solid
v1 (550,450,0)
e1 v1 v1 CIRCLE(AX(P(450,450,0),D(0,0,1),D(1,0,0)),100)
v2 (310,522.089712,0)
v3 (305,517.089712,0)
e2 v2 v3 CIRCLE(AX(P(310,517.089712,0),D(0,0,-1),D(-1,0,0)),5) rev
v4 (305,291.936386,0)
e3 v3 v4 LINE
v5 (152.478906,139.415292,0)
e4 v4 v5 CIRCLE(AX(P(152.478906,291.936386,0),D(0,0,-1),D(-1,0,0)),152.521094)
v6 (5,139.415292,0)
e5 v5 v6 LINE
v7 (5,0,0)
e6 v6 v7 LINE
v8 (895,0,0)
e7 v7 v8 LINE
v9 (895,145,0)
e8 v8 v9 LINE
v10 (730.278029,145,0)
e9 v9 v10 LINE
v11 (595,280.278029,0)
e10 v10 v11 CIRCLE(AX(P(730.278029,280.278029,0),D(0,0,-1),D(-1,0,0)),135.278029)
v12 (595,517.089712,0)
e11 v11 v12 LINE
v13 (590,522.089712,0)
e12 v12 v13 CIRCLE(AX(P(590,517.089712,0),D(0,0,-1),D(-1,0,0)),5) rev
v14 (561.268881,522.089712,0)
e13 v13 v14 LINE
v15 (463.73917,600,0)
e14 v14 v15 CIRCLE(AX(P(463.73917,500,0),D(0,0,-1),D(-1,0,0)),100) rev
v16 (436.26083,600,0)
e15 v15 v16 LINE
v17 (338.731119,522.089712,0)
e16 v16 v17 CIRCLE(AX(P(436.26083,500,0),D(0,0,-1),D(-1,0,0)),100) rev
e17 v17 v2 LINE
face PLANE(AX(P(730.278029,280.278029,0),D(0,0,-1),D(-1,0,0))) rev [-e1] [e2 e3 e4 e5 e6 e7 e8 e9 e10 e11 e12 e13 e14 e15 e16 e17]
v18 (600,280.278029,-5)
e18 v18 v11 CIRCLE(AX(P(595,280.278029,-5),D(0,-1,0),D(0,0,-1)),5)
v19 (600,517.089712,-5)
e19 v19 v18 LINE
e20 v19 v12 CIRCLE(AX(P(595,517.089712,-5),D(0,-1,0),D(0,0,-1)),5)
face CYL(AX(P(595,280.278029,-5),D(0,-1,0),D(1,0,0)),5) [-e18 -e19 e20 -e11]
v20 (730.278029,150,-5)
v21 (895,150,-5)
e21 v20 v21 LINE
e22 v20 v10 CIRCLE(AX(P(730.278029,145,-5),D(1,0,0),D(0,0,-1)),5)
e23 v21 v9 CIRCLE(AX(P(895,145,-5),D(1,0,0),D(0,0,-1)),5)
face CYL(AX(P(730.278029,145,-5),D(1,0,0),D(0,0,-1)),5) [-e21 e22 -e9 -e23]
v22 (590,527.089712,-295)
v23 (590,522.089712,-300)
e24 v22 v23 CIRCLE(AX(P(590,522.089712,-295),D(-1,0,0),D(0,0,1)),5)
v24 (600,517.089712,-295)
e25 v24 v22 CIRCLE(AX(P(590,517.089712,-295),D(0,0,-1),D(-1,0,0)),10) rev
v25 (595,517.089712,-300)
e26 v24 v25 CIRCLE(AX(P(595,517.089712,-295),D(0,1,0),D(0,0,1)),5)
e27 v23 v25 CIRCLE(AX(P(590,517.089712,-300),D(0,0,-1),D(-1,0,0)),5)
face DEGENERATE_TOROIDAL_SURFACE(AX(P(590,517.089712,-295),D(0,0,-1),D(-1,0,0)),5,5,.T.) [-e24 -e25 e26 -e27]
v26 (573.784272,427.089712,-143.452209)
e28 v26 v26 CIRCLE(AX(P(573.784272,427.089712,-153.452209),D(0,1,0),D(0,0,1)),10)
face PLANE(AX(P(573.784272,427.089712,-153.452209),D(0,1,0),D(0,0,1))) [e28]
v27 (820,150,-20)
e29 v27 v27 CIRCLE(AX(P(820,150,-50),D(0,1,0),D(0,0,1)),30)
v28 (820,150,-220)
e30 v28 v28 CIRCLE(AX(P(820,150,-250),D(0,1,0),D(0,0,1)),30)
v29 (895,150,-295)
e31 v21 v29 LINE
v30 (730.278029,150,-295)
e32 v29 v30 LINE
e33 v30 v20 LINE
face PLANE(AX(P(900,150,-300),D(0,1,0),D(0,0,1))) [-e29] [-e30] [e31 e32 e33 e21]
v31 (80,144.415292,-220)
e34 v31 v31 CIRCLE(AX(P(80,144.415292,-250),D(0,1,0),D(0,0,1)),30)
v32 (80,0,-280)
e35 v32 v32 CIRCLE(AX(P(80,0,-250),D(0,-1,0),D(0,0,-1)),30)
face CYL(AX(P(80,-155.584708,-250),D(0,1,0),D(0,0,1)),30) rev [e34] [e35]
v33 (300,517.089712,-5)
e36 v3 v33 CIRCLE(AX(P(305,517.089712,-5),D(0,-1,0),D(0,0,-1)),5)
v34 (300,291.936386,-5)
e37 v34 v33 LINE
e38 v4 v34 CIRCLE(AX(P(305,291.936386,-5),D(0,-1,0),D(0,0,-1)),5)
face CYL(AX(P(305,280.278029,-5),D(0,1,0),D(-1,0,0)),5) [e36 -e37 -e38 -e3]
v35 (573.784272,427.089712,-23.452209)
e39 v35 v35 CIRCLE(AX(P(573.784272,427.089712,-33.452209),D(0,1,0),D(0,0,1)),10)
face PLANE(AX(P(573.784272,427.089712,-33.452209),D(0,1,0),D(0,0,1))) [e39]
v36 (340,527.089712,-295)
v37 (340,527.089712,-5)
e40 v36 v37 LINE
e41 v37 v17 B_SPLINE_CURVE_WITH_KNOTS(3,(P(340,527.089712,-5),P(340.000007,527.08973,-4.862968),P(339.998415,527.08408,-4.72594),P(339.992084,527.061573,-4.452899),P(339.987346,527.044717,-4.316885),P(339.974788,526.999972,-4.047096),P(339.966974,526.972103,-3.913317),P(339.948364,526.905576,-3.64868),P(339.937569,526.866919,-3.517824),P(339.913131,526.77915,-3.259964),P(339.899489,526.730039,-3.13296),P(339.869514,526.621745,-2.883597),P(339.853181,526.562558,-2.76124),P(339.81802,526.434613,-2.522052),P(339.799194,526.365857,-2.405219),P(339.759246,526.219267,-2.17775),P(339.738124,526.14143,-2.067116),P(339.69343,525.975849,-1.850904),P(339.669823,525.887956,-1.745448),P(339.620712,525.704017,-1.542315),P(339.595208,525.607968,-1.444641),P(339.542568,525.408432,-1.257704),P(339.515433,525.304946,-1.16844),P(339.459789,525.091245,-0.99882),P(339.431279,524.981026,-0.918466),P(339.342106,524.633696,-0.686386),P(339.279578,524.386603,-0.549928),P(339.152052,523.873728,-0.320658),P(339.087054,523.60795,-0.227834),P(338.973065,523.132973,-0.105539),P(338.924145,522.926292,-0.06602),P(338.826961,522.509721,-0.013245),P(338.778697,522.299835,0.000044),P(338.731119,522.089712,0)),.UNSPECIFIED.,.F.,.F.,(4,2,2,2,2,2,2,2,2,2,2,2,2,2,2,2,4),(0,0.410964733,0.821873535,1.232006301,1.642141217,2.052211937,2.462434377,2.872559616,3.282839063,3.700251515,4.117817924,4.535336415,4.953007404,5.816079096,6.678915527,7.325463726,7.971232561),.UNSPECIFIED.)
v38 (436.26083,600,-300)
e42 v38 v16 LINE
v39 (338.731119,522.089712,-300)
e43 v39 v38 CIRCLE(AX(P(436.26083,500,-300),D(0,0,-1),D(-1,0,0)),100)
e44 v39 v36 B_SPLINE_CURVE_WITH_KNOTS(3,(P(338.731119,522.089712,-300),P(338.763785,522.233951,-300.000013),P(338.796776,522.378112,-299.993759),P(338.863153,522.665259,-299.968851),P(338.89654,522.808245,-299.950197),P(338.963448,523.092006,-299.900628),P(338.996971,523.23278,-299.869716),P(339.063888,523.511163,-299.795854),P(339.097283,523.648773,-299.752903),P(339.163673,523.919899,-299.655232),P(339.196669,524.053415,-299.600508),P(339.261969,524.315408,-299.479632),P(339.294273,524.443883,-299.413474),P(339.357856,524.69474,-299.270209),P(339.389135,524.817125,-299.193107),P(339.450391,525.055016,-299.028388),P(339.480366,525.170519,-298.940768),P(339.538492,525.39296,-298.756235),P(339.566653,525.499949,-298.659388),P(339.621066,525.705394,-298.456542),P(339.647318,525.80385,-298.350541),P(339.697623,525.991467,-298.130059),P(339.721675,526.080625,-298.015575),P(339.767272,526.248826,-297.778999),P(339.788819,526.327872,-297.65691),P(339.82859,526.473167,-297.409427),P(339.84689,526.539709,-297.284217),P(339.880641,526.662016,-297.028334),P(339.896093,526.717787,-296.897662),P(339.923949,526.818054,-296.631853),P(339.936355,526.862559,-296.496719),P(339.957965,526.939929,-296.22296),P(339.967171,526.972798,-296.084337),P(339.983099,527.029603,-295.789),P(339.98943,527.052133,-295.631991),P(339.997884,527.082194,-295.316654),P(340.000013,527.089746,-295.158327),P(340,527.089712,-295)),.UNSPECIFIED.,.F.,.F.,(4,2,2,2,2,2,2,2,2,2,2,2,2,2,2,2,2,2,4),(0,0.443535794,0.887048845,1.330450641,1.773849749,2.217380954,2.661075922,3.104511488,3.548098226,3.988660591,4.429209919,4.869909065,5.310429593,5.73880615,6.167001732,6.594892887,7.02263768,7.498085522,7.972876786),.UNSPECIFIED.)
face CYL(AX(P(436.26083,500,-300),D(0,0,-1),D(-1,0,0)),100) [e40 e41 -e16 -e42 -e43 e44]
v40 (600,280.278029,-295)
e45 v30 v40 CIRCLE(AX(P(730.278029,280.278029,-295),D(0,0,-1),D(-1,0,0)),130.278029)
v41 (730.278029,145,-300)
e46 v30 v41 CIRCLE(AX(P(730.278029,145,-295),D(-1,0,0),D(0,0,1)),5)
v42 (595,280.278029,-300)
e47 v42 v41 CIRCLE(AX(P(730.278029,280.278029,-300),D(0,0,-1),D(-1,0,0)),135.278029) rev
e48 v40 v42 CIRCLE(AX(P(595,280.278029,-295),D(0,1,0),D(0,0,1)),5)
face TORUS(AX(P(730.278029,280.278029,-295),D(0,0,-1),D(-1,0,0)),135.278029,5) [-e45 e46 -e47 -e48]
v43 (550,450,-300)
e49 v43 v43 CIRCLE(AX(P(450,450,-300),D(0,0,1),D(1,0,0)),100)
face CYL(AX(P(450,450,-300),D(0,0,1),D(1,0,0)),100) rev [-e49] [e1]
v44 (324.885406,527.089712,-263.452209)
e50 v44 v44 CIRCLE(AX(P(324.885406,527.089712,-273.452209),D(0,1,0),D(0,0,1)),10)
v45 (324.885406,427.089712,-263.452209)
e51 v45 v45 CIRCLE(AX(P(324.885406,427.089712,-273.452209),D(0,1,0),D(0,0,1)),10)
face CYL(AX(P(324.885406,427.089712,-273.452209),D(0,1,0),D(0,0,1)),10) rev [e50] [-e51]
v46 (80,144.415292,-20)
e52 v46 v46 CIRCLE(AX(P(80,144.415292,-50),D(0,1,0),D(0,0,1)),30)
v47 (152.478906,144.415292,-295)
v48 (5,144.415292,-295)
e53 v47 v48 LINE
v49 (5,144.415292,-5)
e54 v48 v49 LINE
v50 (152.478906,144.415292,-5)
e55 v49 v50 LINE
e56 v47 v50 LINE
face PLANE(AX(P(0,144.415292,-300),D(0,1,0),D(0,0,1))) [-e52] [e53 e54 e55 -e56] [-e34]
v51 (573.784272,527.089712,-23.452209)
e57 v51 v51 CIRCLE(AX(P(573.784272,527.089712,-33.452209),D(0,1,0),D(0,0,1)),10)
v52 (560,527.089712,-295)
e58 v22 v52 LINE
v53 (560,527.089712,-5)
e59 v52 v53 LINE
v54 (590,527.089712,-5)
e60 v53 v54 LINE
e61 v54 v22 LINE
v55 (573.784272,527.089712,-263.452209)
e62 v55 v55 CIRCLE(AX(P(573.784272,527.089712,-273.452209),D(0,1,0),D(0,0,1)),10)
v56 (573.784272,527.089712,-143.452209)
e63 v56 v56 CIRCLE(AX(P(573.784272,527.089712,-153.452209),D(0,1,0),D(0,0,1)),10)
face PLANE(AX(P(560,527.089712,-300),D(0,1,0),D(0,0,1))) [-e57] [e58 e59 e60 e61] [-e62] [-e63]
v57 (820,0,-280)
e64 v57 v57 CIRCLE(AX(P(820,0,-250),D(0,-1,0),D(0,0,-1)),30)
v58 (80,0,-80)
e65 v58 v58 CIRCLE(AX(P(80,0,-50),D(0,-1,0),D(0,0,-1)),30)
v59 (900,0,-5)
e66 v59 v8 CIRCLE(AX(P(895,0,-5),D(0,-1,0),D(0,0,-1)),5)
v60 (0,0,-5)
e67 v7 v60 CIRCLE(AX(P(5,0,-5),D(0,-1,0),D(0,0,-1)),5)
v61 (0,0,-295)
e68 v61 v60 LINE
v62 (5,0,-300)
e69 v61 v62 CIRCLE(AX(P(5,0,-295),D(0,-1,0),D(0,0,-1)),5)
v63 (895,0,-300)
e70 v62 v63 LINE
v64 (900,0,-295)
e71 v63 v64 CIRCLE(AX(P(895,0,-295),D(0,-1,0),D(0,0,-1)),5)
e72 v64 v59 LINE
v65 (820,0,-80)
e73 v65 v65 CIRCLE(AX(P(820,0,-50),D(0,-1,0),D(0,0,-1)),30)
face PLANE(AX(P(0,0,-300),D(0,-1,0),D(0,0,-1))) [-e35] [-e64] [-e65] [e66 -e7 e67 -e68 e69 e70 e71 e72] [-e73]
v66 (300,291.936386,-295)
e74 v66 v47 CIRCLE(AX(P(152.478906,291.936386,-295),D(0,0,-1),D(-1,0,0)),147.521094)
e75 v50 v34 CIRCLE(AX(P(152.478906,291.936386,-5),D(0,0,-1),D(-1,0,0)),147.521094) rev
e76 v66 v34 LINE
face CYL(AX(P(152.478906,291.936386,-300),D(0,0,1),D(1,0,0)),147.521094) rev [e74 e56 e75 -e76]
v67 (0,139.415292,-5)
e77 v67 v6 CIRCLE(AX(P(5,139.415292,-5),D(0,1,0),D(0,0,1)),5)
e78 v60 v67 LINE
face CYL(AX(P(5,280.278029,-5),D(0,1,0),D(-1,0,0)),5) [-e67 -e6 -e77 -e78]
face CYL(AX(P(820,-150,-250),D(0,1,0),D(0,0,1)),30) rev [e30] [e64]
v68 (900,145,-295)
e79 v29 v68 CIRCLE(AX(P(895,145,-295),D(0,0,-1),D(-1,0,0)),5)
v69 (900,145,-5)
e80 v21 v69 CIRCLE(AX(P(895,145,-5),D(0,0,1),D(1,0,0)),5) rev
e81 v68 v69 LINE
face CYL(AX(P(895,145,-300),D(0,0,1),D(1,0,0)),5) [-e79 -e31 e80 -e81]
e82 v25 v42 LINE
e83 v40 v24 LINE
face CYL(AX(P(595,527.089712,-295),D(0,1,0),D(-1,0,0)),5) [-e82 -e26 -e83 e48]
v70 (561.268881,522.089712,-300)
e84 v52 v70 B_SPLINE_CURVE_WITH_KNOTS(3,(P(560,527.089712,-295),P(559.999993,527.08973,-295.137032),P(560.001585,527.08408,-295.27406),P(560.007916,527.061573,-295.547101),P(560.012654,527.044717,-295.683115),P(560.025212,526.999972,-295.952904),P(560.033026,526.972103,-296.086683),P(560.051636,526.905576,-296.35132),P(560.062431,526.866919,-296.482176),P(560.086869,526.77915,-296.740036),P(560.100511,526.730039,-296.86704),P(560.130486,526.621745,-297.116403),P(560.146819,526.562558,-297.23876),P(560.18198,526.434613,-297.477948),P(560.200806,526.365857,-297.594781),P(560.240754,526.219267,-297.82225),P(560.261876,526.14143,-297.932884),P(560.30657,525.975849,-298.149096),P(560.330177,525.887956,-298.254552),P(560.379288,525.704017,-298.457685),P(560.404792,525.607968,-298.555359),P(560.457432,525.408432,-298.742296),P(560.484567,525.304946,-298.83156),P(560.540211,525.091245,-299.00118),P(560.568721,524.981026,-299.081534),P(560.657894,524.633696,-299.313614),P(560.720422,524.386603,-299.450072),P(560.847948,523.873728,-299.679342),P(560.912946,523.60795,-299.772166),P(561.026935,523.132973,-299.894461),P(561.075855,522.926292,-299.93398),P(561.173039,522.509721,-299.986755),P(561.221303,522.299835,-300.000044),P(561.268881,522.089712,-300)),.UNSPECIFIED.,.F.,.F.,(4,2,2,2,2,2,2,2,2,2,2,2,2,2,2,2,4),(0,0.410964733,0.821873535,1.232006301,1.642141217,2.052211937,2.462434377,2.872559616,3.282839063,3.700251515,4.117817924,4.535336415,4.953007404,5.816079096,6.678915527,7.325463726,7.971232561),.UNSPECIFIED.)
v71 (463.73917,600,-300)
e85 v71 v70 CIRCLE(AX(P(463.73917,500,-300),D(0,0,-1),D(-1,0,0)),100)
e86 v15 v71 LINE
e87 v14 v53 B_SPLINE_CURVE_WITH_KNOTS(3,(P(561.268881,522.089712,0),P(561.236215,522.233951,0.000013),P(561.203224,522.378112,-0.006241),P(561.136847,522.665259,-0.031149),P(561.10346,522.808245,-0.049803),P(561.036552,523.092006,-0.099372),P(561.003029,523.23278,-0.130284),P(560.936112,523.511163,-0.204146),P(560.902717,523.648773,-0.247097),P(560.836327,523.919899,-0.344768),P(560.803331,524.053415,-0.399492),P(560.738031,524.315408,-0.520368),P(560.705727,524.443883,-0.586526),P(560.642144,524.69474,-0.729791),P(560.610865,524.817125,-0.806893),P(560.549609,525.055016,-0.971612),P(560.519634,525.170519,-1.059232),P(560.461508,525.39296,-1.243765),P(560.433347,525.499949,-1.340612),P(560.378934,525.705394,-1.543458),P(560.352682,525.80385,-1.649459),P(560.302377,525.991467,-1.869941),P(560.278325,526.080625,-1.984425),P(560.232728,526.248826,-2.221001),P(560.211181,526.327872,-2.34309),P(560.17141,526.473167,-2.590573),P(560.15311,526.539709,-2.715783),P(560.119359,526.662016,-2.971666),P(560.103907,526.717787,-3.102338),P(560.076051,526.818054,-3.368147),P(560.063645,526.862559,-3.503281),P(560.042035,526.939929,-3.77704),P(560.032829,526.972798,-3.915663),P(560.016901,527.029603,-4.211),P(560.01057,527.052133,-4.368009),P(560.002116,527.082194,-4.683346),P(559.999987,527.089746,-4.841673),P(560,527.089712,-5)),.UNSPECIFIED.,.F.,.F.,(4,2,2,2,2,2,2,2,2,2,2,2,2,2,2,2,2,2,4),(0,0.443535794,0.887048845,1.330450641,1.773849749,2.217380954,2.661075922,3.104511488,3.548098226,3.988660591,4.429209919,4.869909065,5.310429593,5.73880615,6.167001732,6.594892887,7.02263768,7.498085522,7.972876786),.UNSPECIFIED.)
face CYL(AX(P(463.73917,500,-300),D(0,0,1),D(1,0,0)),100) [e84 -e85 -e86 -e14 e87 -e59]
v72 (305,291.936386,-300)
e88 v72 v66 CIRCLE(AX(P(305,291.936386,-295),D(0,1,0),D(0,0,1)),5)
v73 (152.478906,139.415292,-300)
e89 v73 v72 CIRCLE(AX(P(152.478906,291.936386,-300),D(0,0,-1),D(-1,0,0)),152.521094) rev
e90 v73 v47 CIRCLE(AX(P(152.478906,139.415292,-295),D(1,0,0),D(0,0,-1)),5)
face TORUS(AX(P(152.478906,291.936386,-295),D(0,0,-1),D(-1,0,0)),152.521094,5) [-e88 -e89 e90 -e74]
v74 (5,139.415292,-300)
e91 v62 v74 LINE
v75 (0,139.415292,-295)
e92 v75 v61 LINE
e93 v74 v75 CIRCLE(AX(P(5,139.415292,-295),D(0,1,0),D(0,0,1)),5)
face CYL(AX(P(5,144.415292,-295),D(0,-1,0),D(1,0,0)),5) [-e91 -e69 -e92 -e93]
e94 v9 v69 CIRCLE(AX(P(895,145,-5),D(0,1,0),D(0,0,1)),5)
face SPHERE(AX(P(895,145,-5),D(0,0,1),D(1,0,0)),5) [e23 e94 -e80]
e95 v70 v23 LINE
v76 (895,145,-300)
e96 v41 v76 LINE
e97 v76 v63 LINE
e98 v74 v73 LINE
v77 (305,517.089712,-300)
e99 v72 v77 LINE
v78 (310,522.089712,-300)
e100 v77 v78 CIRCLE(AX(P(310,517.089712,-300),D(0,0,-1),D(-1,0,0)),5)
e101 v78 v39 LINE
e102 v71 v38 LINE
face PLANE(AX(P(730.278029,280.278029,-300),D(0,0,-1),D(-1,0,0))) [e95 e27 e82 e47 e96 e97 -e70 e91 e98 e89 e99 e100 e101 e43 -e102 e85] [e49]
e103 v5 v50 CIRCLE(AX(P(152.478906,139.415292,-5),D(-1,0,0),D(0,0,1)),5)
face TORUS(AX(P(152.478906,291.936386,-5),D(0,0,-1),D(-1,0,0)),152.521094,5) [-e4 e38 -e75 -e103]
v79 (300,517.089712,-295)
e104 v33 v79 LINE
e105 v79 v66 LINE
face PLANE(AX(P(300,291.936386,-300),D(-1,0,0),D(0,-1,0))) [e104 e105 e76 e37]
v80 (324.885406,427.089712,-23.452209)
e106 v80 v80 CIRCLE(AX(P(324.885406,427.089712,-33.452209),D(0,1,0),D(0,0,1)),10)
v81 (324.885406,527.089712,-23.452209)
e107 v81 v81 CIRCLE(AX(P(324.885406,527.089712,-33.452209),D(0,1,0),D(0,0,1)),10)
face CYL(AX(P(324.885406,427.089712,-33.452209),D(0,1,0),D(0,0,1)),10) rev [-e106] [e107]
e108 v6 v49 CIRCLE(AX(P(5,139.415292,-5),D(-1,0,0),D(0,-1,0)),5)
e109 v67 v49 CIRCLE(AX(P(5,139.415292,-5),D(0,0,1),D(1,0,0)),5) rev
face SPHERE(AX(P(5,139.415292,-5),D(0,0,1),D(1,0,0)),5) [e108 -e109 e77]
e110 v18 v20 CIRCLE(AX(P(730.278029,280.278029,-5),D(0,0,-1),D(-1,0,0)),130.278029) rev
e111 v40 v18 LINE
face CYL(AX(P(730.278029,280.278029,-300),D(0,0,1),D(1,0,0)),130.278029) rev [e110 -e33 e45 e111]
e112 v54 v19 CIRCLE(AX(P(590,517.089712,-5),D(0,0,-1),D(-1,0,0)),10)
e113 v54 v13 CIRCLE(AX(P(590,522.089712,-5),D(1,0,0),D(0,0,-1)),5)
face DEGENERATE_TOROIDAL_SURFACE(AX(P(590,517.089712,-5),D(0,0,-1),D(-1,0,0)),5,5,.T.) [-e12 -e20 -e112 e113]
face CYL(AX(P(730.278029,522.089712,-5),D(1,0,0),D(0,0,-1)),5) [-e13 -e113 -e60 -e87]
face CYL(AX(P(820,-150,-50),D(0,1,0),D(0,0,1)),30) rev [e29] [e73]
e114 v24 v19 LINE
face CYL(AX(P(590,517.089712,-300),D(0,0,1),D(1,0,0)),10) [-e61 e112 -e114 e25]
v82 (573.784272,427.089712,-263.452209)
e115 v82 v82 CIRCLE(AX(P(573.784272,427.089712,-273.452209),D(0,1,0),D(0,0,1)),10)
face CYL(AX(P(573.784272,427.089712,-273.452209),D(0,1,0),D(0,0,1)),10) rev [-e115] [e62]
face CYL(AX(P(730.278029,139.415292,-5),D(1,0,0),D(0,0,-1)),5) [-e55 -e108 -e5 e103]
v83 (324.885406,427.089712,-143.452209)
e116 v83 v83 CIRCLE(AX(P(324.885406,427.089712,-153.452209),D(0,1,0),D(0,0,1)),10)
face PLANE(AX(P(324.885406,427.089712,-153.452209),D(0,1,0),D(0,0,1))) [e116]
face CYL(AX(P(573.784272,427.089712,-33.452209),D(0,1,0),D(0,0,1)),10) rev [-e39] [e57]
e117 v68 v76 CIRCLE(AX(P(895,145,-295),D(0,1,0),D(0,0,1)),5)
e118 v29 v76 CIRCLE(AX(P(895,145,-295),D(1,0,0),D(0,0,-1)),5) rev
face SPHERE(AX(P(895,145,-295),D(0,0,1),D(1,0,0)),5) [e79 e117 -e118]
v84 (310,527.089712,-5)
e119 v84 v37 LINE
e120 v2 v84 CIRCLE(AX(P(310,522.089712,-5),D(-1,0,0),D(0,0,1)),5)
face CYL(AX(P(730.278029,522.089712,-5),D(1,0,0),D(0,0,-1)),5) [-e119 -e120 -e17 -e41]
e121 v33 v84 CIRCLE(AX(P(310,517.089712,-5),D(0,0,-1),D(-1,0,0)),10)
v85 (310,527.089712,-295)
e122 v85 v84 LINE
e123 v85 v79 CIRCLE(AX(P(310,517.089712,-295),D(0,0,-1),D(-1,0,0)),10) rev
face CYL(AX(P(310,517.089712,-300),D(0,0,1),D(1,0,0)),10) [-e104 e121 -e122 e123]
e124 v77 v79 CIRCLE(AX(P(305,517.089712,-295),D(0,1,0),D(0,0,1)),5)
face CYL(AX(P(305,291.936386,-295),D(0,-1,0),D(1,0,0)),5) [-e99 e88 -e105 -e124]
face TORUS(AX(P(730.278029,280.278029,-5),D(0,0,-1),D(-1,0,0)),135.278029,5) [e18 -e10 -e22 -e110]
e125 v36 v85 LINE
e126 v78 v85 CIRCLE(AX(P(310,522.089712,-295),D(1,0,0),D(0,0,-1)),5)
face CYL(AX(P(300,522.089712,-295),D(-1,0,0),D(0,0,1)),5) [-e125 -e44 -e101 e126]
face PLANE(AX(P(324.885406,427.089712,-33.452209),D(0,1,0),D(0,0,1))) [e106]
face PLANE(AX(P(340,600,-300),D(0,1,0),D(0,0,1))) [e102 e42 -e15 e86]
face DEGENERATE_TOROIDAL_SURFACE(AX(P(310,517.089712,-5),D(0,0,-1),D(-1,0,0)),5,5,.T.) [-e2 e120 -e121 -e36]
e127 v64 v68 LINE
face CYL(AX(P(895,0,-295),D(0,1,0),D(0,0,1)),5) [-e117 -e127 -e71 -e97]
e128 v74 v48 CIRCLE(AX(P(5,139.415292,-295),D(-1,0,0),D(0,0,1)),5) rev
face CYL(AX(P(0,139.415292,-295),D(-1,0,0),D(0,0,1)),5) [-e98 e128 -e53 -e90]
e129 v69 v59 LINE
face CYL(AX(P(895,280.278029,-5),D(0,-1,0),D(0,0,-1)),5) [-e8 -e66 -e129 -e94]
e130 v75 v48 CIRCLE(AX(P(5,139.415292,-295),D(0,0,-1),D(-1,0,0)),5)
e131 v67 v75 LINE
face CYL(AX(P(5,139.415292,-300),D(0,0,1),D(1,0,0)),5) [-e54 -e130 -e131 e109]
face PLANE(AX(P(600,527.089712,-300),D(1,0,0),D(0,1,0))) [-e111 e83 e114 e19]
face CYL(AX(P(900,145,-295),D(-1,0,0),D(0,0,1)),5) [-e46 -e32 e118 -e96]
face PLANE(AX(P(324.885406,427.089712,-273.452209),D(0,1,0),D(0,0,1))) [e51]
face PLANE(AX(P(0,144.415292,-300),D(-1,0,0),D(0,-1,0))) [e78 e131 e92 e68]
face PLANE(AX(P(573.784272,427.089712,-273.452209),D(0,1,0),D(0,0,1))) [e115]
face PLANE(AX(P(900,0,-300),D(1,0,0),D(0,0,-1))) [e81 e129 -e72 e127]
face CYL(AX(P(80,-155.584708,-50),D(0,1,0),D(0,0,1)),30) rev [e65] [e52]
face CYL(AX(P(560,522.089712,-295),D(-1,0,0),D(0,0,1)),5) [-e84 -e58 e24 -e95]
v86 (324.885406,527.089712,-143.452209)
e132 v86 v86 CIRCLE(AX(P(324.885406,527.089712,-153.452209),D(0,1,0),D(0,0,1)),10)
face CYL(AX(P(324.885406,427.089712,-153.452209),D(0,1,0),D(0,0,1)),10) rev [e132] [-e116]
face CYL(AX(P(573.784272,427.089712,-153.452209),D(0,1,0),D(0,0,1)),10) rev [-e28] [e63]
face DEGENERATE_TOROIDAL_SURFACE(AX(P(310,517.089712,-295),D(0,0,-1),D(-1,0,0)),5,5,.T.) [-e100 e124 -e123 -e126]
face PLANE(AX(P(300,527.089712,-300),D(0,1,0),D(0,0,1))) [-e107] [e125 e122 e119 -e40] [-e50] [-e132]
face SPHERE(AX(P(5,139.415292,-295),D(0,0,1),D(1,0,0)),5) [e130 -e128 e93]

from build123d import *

# Parameters (mm, degrees)
ESQUISSE1_R                = 100
BOSS_EXTRU_1_DEPTH         = 300
ESQUISSE2_R                = 30
ENL_V_MAT_EXTRU_1_DEPTH    = 300
CONG_3_R                   = 100
CONG_4_R                   = 10
ESQUISSE3_R                = 30
ENL_V_MAT_EXTRU_2_DEPTH    = 300
ESQUISSE4_R                = 10
ENL_V_MAT_EXTRU_3_DEPTH    = 100
R_P_TITION_LIN_AIRE1_COUNT = 3
R_P_TITION_LIN_AIRE1_PITCH = 120
CONG_5_R                   = 5


with BuildPart() as part:
    # Esquisse1 → Boss.-Extru.1 (new body)
    with BuildSketch(Plane.XY):
        with BuildLine():
            Line((0, 0), (900, 0))
            Line((900, 0), (900, 150))
            Line((900, 150), (730.278028845, 150))
            ThreePointArc((730.278028845, 150), (638.157551209, 188.157551209), (600, 280.278028845))
            Line((600, 280.278028845), (600, 375))
            Line((600, 375), (600, 527.089712385))
            Line((600, 527.089712385), (560, 527.089712385))
            Line((560, 527.089712385), (560, 600))
            Line((560, 600), (340, 600))
            Line((340, 600), (340, 527.089712385))
            Line((340, 527.089712385), (300, 527.089712385))
            Line((300, 527.089712385), (300, 375))
            Line((300, 375), (300, 291.936386231))
            ThreePointArc((300, 291.936386231), (256.792071963, 187.623220362), (152.478906094, 144.415292325))
            Line((152.478906094, 144.415292325), (0, 144.415292325))
            Line((0, 144.415292325), (0, 0))
        make_face()
        with Locations((450, 450)):
            Circle(ESQUISSE1_R, mode=Mode.SUBTRACT)
    extrude(amount=-BOSS_EXTRU_1_DEPTH)

    # Esquisse2 → Enlèv. mat.-Extru.1 (cut)
    with BuildSketch(Plane(origin=(0, 144.415292325, 0), x_dir=(1, 0, 0), z_dir=(0, 1, 0))):
        with Locations(Location((80, 250, 0), (0, 0, 270))):
            Circle(ESQUISSE2_R)
        with Locations(Location((80, 50, 0), (0, 0, 270))):
            Circle(ESQUISSE2_R)
    extrude(amount=-ENL_V_MAT_EXTRU_1_DEPTH, mode=Mode.SUBTRACT)

    # Congé3
    # the kernel refuses this fillet: 100 mm, written as the material it takes off along each edge
    with BuildSketch(Plane(origin=(340, 600, 240.652076177), x_dir=(1, 0, 0), z_dir=(0, 0, -1))) as cong_3_piece_1:
        with BuildLine():
            CenterArc((96.260830471, 100), CONG_3_R, 195.717657912, 74.282342088)
            Line((0, 72.910287615), (-1.925216609, 72.368493368))
            ThreePointArc((-1.925216609, 72.368493368), (-2, 36.455143808), (-2, 0))
            Line((-2, 0), (0, -2))
            Line((0, -2), (96.260830471, -2))
            Line((96.260830471, -2), (96.260830471, 0))
        make_face()
    extrude(amount=781.304152354, mode=Mode.SUBTRACT)
    with BuildSketch(Plane(origin=(560, 600, 240.652076177), x_dir=(0, -1, 0), z_dir=(0, 0, -1))) as cong_3_piece_2:
        with BuildLine():
            CenterArc((100, 96.260830471), CONG_3_R, 180, 74.282342088)
            Line((0, 96.260830471), (-2, 96.260830471))
            Line((-2, 96.260830471), (-2, 0))
            Line((-2, 0), (0, -2))
            ThreePointArc((0, -2), (36.455143808, -2), (72.368493368, -1.925216609))
            Line((72.368493368, -1.925216609), (72.910287615, 0))
        make_face()
    extrude(amount=781.304152354, mode=Mode.SUBTRACT)

    # Congé4
    cong_4_edges = [part.edges().sort_by_distance(p)[0] for p in [
        (300, 527.089712385, -150),
        (600, 527.089712385, -150),
    ]]
    fillet(cong_4_edges, radius=CONG_4_R)

    # Esquisse3 → Enlèv. mat.-Extru.2 (cut)
    with BuildSketch(Plane(origin=(0, 150, 0), x_dir=(1, 0, 0), z_dir=(0, 1, 0))):
        with Locations(Location((820, 250, 0), (0, 0, 270))):
            Circle(ESQUISSE3_R)
        with Locations(Location((820, 50, 0), (0, 0, 270))):
            Circle(ESQUISSE3_R)
    extrude(amount=-ENL_V_MAT_EXTRU_2_DEPTH, mode=Mode.SUBTRACT)

    # Esquisse4 → Enlèv. mat.-Extru.3 (cut)
    with BuildSketch(Plane(origin=(0, 527.089712385, 0), x_dir=(1, 0, 0), z_dir=(0, 1, 0))):
        with Locations(Location((573.784271885, 273.452208884, 0), (0, 0, 270))):
            Circle(ESQUISSE4_R)
        with Locations(Location((324.885406348, 273.452208884, 0), (0, 0, 270))):
            Circle(ESQUISSE4_R)
    enl_v_mat_extru_3 = extrude(amount=-ENL_V_MAT_EXTRU_3_DEPTH, mode=Mode.SUBTRACT)

    # Répétition linéaire1: Enlèv. mat.-Extru.3 ×3
    with Locations(*[(0, 0, i * R_P_TITION_LIN_AIRE1_PITCH) for i in range(1, R_P_TITION_LIN_AIRE1_COUNT)]):
        add(enl_v_mat_extru_3, mode=Mode.SUBTRACT)

    # Congé5
    cong_5_edges = [part.edges().sort_by_distance(p)[0] for p in [
        (900, 75, -300),
        (76.239453047, 144.415292325, 0),
        (256.792071963, 187.623220362, 0),
        (815.139014422, 150, -300),
        (325, 527.089712385, 0),
        (600, 398.683870615, 0),
        (638.157551209, 188.157551209, 0),
        (815.139014422, 150, 0),
        (638.157551209, 188.157551209, -300),
        (900, 75, 0),
        (0, 72.207646162, 0),
        (600, 398.683870615, -300),
        (0, 144.415292325, -150),
        (900, 150, -150),
        (325, 527.089712385, -300),
        (0, 72.207646162, -300),
        (256.792071963, 187.623220362, -300),
        (76.239453047, 144.415292325, -300),
        (300, 404.513049308, 0),
        (575, 527.089712385, 0),
        (597.071067812, 524.160780197, 0),
        (302.928932188, 524.160780197, 0),
        (300, 404.513049308, -300),
        (575, 527.089712385, -300),
        (597.071067812, 524.160780197, -300),
        (302.928932188, 524.160780197, -300),
    ]]
    fillet(cong_5_edges, radius=CONG_5_R)


solid = part.part
